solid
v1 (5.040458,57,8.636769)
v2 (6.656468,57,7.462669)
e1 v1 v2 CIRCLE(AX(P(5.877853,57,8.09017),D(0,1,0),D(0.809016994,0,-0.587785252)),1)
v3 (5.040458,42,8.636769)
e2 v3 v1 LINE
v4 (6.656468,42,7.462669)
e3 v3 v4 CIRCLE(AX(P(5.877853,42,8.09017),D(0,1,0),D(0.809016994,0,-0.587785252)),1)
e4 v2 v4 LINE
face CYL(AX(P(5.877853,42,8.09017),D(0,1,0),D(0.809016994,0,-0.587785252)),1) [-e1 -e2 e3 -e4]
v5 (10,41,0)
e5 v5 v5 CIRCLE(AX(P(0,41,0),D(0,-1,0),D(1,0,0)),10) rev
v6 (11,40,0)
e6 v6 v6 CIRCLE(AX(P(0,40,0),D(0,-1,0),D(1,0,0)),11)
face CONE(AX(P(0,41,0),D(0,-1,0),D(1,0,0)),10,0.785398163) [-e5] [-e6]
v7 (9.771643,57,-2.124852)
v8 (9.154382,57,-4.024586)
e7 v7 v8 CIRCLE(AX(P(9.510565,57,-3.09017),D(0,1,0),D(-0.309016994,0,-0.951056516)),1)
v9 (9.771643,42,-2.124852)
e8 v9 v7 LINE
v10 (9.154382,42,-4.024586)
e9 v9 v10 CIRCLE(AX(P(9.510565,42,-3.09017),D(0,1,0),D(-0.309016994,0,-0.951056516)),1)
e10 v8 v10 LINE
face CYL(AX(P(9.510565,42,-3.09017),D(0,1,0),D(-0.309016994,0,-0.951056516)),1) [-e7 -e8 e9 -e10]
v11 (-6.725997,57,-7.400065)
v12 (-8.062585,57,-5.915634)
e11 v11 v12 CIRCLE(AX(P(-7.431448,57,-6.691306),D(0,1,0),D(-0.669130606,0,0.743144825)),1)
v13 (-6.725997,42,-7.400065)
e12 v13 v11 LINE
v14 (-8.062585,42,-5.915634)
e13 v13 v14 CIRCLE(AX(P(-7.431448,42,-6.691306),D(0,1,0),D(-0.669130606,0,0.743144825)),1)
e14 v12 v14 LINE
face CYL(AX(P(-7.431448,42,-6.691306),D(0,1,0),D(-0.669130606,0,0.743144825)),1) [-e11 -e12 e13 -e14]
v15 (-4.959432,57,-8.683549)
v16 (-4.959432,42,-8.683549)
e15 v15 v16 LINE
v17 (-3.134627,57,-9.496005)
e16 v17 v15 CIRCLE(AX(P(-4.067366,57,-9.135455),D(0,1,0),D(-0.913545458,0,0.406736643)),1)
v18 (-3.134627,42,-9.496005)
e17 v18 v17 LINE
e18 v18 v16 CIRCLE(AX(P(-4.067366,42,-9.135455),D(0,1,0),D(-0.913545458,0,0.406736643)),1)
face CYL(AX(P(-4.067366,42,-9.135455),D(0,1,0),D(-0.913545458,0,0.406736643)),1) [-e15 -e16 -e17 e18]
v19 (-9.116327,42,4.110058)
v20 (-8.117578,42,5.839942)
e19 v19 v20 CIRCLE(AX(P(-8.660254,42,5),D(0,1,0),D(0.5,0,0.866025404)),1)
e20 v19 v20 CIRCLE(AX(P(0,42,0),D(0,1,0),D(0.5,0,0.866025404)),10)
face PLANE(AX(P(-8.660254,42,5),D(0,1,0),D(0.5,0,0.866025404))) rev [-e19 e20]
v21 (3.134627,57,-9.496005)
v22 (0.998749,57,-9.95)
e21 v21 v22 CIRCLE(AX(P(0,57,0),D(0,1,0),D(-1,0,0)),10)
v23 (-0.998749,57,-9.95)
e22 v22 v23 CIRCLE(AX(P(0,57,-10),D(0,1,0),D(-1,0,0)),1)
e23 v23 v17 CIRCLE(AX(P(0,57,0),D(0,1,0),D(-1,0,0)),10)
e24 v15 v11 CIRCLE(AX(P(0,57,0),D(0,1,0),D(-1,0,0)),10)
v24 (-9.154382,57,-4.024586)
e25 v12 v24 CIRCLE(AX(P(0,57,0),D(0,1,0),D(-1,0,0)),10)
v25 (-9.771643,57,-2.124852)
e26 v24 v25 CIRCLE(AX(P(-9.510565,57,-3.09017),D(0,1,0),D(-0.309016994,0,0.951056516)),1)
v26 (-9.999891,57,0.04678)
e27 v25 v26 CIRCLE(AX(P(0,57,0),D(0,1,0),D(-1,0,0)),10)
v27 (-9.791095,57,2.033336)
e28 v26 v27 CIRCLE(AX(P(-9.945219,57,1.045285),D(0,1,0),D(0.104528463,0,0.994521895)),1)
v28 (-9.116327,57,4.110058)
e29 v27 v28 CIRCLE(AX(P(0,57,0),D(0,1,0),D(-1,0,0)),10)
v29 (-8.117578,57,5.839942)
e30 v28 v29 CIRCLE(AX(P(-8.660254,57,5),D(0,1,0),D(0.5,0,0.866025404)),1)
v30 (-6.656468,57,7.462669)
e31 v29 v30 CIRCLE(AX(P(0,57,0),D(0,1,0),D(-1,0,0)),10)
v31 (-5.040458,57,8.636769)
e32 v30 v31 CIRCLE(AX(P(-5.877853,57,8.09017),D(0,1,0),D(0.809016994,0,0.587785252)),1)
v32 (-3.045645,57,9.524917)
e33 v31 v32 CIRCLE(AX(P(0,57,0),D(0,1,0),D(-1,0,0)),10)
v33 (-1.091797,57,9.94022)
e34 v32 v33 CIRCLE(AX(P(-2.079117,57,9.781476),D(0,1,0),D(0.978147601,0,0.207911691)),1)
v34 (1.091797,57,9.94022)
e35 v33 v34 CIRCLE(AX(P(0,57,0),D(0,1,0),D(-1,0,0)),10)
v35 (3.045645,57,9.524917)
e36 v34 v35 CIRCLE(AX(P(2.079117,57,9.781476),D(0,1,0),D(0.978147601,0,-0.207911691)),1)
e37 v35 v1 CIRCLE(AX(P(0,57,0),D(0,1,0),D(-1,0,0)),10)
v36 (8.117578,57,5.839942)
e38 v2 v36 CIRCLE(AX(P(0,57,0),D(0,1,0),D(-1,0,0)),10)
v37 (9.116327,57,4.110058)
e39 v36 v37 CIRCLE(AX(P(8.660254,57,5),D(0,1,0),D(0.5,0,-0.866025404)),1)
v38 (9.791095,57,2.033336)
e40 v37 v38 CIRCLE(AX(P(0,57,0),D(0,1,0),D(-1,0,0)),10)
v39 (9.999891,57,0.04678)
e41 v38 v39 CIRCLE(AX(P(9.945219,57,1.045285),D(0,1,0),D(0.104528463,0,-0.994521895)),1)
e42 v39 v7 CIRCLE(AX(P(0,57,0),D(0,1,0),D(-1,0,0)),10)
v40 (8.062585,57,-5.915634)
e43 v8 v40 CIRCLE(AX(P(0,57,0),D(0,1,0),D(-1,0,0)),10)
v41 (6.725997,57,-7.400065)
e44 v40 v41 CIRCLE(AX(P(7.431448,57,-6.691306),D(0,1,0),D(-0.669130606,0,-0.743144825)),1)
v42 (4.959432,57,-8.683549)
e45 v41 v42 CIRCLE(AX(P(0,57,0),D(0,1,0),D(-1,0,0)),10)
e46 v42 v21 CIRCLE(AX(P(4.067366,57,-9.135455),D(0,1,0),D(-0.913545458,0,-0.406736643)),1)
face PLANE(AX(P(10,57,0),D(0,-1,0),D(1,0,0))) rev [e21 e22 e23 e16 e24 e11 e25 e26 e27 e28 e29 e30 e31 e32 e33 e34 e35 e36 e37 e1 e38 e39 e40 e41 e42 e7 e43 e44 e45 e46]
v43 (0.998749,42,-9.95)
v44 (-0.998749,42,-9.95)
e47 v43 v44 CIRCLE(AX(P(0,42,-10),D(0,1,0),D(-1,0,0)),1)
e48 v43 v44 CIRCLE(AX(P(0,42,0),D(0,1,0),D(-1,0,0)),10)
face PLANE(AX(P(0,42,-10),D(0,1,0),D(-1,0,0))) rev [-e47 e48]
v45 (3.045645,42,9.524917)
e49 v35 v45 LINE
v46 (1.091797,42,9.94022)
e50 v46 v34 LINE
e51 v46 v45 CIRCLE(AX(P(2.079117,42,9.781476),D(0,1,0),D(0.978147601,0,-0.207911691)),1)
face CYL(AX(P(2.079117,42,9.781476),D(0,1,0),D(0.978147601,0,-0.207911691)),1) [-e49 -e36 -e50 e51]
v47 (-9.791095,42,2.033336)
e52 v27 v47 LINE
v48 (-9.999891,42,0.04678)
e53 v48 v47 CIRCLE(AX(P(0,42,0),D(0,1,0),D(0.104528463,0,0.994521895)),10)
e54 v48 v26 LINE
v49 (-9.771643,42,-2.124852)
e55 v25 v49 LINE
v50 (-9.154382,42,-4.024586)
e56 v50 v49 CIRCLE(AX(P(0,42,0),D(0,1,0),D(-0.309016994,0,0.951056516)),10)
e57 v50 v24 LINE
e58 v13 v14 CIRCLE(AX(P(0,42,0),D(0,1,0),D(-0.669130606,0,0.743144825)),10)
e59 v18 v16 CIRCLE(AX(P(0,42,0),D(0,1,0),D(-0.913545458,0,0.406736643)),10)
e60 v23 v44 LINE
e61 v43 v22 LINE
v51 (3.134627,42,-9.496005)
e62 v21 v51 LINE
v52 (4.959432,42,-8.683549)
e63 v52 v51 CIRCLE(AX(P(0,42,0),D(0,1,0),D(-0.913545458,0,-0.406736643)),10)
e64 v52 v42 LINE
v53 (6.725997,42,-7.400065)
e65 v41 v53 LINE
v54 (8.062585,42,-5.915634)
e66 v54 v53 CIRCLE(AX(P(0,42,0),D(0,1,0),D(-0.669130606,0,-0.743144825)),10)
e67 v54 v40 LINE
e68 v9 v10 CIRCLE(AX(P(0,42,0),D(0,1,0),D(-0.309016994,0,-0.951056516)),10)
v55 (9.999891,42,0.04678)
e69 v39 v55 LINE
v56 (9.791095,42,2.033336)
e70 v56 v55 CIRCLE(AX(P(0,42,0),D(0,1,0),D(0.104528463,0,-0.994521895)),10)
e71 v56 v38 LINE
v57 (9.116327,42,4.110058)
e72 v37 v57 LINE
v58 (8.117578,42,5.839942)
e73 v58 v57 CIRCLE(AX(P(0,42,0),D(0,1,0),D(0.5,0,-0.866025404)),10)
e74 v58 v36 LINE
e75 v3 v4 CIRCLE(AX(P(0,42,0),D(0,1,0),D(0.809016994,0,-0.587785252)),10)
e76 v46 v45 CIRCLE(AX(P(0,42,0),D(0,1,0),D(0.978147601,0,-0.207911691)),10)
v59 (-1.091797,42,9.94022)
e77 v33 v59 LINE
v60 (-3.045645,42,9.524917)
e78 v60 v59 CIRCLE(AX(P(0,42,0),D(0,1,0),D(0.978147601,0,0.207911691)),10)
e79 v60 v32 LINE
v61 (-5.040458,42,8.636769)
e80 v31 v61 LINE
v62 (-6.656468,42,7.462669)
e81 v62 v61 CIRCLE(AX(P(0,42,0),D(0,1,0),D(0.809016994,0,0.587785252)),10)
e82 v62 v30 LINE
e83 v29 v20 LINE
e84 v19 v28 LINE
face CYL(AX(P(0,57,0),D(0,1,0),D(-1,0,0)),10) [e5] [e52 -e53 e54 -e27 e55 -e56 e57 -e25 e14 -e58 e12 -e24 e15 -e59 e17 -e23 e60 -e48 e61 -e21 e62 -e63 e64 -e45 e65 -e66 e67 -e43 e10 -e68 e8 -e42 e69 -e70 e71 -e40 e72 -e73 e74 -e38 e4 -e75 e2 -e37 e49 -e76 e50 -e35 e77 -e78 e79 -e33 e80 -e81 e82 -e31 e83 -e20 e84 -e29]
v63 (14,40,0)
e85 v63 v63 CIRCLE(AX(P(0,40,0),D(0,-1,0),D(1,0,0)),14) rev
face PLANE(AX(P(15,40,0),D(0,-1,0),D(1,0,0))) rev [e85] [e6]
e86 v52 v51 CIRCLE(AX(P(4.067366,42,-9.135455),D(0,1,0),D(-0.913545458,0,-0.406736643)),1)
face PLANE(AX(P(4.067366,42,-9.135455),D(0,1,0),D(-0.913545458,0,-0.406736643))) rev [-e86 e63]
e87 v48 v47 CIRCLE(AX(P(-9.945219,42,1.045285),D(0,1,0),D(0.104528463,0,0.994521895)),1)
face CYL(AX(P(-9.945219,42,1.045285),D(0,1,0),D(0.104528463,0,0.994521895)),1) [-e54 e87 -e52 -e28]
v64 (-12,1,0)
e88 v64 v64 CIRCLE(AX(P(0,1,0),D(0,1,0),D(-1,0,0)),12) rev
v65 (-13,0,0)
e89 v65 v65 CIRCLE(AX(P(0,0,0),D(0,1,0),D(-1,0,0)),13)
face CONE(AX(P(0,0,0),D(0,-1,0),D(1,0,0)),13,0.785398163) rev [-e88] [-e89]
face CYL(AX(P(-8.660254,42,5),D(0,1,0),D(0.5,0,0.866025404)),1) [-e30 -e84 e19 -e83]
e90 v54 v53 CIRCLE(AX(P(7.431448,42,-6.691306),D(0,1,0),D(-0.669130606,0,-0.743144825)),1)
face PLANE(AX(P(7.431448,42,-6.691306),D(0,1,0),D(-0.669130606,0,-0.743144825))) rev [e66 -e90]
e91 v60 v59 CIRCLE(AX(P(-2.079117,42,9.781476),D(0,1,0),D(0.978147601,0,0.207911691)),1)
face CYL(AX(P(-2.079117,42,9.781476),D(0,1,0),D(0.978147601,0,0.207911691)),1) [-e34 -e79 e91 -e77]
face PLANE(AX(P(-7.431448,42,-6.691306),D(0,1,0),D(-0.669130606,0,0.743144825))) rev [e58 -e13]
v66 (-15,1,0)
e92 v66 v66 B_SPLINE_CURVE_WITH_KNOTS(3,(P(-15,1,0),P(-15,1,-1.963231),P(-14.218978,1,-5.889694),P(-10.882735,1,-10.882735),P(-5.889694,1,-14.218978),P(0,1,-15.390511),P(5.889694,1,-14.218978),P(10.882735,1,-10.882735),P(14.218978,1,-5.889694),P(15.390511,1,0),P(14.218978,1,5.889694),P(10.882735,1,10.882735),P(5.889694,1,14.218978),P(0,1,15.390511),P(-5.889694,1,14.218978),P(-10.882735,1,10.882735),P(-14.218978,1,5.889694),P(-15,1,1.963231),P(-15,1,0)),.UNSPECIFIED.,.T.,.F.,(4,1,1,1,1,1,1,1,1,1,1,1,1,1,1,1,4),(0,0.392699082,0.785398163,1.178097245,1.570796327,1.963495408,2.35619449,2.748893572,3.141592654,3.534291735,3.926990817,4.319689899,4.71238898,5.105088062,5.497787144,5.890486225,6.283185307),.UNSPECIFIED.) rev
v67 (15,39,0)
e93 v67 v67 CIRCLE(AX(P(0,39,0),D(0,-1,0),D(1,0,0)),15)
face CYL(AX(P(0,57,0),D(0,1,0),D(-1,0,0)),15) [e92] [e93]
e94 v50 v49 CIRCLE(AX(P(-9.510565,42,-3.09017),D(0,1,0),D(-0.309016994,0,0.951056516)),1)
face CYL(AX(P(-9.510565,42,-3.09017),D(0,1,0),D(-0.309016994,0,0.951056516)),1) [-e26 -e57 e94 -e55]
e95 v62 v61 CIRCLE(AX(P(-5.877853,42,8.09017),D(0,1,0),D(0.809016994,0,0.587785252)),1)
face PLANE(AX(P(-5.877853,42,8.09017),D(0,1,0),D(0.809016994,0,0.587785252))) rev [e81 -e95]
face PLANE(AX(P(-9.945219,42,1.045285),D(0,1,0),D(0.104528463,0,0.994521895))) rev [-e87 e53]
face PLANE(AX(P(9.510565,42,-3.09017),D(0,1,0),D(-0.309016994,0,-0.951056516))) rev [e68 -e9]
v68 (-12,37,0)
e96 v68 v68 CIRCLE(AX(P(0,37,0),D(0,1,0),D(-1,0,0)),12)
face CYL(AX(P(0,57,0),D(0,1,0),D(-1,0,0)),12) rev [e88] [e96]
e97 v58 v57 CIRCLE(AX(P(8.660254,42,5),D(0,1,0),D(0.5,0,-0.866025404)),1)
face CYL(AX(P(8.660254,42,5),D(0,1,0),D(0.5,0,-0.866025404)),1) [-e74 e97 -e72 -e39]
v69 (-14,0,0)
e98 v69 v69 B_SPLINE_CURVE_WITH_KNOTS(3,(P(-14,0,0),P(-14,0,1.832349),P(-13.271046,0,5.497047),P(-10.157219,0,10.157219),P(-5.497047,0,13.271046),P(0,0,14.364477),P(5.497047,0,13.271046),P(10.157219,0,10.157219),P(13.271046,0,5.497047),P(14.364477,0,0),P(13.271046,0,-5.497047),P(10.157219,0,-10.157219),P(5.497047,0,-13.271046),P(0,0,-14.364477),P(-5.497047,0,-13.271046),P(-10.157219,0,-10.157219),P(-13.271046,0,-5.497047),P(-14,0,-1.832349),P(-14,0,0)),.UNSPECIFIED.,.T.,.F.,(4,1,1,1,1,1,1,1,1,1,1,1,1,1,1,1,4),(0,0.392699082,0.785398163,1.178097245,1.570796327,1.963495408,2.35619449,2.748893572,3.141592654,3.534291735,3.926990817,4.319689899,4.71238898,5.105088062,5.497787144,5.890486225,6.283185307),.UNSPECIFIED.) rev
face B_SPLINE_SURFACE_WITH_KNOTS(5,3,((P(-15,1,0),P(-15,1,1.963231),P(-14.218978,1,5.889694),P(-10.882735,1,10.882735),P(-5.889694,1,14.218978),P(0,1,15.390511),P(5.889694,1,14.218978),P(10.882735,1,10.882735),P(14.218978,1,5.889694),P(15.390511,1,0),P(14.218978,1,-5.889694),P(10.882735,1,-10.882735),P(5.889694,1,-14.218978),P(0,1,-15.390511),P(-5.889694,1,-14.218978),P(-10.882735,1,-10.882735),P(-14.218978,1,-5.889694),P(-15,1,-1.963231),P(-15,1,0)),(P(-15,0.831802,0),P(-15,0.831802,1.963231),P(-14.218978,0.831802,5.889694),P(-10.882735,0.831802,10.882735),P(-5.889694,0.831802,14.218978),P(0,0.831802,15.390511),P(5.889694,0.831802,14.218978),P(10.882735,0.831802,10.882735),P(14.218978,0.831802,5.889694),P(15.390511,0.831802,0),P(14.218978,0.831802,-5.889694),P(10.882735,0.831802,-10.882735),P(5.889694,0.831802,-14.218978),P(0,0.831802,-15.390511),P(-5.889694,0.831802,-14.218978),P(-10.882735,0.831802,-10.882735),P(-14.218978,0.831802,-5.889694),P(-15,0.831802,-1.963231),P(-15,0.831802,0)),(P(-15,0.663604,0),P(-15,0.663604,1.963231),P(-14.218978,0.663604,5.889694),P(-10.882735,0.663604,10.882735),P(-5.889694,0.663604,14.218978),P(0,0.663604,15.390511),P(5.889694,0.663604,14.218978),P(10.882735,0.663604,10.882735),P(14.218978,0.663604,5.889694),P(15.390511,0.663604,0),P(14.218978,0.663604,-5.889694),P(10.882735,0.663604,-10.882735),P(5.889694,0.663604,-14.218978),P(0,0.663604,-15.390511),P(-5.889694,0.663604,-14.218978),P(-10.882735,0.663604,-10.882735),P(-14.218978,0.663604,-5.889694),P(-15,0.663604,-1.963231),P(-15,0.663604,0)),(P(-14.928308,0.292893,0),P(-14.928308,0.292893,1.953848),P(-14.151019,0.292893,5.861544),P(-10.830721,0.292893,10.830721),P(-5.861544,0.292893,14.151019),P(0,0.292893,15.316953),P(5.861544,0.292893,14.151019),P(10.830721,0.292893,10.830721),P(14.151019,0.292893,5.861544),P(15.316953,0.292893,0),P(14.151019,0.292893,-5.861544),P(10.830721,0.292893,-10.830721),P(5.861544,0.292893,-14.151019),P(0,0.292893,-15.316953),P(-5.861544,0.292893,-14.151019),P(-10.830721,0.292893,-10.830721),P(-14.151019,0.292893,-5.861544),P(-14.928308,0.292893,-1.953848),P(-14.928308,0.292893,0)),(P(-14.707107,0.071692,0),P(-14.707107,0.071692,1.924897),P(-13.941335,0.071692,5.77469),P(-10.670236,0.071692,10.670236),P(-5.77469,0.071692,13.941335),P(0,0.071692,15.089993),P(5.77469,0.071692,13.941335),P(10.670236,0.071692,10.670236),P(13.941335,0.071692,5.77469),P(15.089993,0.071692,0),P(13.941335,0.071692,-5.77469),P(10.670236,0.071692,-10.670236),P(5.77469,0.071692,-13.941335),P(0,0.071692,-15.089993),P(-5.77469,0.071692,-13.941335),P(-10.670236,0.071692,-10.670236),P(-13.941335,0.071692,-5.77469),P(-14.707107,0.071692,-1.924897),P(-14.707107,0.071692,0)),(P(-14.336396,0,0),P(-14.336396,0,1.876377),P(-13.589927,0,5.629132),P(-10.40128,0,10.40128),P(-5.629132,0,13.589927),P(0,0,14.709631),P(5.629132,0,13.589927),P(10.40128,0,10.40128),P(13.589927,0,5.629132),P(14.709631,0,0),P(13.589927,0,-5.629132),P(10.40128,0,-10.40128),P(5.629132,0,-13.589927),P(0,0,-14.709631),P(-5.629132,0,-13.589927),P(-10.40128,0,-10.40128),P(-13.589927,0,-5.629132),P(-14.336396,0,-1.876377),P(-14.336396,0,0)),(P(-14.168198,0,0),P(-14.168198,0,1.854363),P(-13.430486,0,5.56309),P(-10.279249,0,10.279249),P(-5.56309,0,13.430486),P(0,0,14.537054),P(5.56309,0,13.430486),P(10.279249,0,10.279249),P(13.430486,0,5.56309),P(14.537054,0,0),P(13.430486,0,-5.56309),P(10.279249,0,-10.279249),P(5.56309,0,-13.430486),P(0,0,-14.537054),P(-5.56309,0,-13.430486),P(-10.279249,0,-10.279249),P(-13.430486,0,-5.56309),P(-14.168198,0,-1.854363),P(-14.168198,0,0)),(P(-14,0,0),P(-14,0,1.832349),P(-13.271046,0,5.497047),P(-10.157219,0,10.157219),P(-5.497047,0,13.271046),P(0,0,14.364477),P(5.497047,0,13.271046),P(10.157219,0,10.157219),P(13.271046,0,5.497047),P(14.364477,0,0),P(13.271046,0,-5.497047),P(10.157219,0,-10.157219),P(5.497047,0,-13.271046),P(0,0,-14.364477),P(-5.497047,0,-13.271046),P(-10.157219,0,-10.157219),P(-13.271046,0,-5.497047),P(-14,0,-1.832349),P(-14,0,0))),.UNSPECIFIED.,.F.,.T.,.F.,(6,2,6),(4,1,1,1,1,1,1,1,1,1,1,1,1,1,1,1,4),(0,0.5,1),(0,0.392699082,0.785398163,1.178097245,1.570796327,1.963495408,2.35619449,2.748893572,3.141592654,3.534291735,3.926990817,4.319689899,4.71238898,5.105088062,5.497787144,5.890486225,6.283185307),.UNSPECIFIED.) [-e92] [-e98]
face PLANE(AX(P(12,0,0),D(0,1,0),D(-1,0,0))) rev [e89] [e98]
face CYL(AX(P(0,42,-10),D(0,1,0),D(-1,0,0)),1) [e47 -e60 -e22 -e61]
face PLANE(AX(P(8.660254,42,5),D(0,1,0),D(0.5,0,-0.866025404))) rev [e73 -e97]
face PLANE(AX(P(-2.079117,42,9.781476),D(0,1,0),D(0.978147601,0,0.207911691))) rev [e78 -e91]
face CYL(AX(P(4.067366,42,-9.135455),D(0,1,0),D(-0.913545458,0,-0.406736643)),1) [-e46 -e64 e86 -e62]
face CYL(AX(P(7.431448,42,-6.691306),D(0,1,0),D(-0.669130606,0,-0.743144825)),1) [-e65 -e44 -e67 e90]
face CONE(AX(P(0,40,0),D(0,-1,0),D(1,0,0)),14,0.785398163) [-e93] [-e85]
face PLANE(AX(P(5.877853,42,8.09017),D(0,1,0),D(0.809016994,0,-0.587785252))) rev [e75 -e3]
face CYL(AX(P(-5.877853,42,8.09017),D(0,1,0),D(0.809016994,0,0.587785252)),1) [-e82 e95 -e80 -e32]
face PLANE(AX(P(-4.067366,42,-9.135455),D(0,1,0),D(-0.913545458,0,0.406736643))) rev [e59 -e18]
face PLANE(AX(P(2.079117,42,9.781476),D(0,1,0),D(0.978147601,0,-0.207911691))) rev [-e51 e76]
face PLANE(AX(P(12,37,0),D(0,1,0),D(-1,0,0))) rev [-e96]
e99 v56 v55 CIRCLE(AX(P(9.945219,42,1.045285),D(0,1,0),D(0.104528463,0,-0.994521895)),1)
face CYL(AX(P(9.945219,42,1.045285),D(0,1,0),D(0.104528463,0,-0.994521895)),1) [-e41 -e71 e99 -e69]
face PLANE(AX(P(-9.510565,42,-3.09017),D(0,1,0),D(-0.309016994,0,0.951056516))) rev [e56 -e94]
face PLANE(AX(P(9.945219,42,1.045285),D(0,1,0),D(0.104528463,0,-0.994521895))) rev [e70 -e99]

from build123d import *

# Parameters (mm, degrees)
CHAMFER1_SIZE       = 1
FILLET1_SIZE        = 1
SKETCH2_R           = 1
BOSS_EXTRUDE1_DEPTH = 15
CIRPATTERN1_COUNT   = 15


with BuildPart() as part:
    # Sketch1 → Revolve1 (revolve)
    with BuildSketch(Plane.XY, mode=Mode.PRIVATE) as revolve1_sk:
        Polygon((15, 0), (15, 40), (10, 40), (10, 57), (0, 57), (0, 37), (12, 37), (12, 0), align=None)
    revolve(revolve1_sk.sketch.rotate(Axis((0, 57, 0), (0, -1, 0)), 180), axis=Axis((0, 57, 0), (0, -1, 0)))

    # Chamfer1
    chamfer1_edges = [part.edges().sort_by_distance(p)[0] for p in [
        (12, 0, 0),
        (10, 40, 0),
        (15, 40, 0),
    ]]
    chamfer(chamfer1_edges, length=CHAMFER1_SIZE)

    # Fillet1
    # a fillet whose section is not a circle: 1 mm, written as the material it takes off along each edge
    with BuildSketch(Plane(origin=(0, 0, 0), x_dir=(-1, 0, 0), z_dir=(0, 0, 1))) as fillet1_piece_1:
        with BuildLine():
            add(Edge.make_bspline([(15, -FILLET1_SIZE), (15, -FILLET1_SIZE * 0.831801948466), (15, -FILLET1_SIZE * 0.663603896932), (15 - FILLET1_SIZE * 0.0716919198361, -FILLET1_SIZE * 0.292893218813), (15 - FILLET1_SIZE * 0.292893218813, -FILLET1_SIZE * 0.0716919198361), (15 - FILLET1_SIZE * 0.663603896932, 0), (15 - FILLET1_SIZE * 0.831801948466, 0), (15 - FILLET1_SIZE, 0)], knots=[0, 0, 0, 0, 0, 0, 0.5, 0.5, 1, 1, 1, 1, 1, 1], degree=5))
            Line((15 - FILLET1_SIZE, 0), (15, 0))
            Line((15, 0), (15, -FILLET1_SIZE))
        make_face()
    revolve(axis=Axis((0, 0, 0), (0, -1, 0)), mode=Mode.SUBTRACT)

    # Sketch2 → Boss-Extrude1 (add)
    with BuildSketch(Plane(origin=(0, 57, 0), x_dir=(1, 0, 0), z_dir=(0, 1, 0))):
        with Locations((0, 10)):
            Circle(SKETCH2_R)
    boss_extrude1 = extrude(amount=-BOSS_EXTRUDE1_DEPTH)

    # CirPattern1: Boss-Extrude1 ×15 about axis
    cirpattern1_axis = Axis((0, 0, 0), (0, 1, 0))
    for i in range(1, CIRPATTERN1_COUNT):
        add(boss_extrude1.rotate(cirpattern1_axis, i * 360 / CIRPATTERN1_COUNT))


solid = part.part
